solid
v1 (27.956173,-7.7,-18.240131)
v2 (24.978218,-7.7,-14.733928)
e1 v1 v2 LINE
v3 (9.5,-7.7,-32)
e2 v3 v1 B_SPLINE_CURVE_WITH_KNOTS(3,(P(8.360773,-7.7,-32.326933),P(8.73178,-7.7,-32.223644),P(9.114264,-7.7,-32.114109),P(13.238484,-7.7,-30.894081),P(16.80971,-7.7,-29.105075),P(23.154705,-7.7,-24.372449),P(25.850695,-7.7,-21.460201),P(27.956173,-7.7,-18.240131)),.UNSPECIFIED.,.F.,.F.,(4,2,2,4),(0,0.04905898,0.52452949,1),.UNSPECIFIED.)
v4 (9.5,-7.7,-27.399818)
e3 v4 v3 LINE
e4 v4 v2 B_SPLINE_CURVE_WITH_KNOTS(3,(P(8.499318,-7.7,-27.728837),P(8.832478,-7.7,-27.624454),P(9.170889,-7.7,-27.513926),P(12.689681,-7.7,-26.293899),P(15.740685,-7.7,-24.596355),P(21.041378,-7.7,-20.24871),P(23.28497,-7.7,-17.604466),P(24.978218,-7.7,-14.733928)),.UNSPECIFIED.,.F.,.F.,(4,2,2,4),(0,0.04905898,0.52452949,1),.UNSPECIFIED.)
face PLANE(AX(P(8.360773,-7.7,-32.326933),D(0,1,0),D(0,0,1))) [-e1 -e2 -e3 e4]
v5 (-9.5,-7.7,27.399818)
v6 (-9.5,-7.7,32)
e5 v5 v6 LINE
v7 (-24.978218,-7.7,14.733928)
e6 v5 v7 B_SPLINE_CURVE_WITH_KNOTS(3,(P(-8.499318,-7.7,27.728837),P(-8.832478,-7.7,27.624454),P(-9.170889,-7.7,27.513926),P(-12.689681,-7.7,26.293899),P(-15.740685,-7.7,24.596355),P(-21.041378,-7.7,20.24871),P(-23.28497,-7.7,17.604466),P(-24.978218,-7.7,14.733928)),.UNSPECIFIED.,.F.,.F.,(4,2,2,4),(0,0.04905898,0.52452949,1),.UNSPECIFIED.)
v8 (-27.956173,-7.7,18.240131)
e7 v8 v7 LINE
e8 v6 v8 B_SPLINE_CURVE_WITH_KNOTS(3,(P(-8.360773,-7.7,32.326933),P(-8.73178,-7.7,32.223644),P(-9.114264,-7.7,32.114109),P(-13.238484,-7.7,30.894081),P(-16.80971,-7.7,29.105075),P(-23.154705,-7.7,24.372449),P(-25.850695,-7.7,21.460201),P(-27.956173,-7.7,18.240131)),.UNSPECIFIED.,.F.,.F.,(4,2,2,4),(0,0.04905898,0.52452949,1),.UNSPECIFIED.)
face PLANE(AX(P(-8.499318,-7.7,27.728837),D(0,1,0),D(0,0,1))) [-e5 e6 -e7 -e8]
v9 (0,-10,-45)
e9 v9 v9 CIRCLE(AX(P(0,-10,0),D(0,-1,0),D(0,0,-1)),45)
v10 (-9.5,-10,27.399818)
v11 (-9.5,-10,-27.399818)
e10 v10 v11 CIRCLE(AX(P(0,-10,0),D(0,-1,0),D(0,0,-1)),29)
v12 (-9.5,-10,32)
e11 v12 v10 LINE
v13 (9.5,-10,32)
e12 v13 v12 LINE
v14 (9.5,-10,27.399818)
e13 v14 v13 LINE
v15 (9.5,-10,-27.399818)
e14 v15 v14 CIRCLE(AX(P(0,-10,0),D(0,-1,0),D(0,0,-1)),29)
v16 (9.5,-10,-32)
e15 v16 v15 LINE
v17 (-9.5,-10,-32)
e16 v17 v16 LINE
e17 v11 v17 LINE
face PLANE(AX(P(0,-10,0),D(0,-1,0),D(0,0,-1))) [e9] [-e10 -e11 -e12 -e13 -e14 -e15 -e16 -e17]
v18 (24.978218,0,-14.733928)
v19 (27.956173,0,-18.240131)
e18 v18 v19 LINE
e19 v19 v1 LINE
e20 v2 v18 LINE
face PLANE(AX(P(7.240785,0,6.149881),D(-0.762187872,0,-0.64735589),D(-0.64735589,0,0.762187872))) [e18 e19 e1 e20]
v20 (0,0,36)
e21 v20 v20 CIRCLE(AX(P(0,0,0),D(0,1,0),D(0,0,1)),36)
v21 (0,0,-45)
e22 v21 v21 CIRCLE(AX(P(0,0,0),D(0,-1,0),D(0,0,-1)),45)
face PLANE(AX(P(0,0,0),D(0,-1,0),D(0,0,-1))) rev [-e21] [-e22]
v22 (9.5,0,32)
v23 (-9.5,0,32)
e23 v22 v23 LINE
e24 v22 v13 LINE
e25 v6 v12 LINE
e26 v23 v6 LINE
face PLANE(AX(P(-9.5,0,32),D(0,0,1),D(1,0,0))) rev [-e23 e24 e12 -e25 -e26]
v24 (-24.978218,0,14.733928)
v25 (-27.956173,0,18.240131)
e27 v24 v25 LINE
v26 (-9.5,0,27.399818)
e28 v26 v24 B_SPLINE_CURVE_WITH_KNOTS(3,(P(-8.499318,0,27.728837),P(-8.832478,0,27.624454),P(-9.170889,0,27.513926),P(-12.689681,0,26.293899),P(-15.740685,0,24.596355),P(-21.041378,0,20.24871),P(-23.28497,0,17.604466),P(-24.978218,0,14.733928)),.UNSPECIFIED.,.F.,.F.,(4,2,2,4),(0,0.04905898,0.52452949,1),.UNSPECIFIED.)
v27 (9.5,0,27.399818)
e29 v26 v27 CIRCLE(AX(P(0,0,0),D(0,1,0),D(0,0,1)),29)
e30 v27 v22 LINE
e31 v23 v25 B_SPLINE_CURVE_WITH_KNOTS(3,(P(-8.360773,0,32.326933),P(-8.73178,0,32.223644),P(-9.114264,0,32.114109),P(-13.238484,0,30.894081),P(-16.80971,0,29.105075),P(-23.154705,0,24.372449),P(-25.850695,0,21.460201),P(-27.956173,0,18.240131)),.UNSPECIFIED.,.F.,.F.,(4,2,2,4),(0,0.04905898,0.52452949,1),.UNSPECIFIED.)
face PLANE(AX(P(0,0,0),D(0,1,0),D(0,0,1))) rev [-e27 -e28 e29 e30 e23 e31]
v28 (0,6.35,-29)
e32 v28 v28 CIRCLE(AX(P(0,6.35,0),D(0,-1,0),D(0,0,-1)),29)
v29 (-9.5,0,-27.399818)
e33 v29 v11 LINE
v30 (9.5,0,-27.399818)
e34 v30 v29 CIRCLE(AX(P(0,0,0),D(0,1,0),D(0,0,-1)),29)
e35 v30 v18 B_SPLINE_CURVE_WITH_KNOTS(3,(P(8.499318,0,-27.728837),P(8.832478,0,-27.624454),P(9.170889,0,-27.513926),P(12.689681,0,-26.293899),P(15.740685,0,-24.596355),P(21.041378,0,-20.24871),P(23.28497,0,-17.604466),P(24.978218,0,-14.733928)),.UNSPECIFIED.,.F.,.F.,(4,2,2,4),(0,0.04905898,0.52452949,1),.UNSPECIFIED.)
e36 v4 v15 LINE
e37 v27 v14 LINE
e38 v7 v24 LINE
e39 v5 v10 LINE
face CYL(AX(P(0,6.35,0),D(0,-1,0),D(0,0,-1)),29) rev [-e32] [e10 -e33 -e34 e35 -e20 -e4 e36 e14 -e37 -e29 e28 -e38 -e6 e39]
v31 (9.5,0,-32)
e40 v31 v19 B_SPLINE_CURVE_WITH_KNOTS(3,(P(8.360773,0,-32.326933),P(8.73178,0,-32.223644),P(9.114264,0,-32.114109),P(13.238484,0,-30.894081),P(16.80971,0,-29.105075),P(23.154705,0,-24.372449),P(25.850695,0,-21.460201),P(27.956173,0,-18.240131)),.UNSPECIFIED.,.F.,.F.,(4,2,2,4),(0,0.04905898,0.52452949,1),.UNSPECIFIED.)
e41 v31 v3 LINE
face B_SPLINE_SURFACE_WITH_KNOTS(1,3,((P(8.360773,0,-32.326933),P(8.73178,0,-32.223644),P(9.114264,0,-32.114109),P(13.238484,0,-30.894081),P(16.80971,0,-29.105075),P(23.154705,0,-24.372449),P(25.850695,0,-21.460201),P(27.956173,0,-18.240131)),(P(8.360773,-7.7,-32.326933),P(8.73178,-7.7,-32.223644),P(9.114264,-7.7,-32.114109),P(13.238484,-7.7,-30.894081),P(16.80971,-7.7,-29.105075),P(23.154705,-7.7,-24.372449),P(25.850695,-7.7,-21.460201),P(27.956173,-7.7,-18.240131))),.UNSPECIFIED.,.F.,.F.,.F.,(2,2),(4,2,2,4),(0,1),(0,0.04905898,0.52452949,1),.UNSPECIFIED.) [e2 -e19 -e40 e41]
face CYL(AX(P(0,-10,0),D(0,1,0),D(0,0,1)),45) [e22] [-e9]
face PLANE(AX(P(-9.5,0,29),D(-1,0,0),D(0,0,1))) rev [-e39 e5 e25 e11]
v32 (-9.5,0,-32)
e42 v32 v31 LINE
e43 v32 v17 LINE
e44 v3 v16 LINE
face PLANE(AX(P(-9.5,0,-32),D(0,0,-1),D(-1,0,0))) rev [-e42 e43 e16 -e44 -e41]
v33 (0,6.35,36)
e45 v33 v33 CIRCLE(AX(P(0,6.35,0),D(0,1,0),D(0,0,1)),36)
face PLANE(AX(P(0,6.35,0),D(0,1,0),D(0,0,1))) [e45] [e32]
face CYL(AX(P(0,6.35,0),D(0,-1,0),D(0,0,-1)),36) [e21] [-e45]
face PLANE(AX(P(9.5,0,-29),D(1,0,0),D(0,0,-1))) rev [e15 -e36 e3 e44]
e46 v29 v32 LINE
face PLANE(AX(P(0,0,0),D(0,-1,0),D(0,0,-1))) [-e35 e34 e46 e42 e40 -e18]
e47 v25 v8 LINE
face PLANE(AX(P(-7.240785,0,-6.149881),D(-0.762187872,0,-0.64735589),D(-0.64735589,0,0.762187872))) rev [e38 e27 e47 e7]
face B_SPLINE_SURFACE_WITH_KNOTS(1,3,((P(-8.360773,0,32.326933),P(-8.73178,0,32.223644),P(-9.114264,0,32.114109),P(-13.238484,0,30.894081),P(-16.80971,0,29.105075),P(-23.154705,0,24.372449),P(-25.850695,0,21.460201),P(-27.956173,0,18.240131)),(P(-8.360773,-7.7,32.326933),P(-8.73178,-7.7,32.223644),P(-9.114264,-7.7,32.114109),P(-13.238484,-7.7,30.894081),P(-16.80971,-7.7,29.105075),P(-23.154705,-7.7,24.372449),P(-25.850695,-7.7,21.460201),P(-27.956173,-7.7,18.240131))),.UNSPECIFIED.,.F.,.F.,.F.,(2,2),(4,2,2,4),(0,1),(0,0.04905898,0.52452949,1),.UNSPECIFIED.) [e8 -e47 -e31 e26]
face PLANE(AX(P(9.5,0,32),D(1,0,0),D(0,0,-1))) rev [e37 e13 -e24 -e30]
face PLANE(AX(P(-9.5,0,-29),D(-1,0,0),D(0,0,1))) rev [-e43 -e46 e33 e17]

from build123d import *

# Parameters (mm, degrees)
SKETCH1_R           = 36
BOSS_EXTRUDE1_DEPTH = 6.35
SKETCH2_R           = 29
CUT_EXTRUDE1_DEPTH  = 52.306164347
BOSS_EXTRUDE2_START = 10
SKETCH3_R           = 45
SKETCH3_R_2         = 29
BOSS_EXTRUDE2_DEPTH = 10
CUT_EXTRUDE2_DEPTH  = 10
CUT_SWEEP1_START    = -7.7
CUT_SWEEP1_DEPTH    = 7.7
CUT_SWEEP2_START    = -7.7
CUT_SWEEP2_DEPTH    = 7.7


# Read off the part's stored shape, not the designer's step: Cut-Sweep1, Cut-Sweep2
with BuildPart() as part:
    # Sketch1 → Boss-Extrude1 (new body)
    with BuildSketch(Plane(origin=(0, 0, 0), x_dir=(1, 0, 0), z_dir=(0, 1, 0))):
        with Locations(Location((0, 0, 0), (0, 0, 270))):
            Circle(SKETCH1_R)
    extrude(amount=BOSS_EXTRUDE1_DEPTH)

    # Sketch2 → Cut-Extrude1 (cut, through all)
    with BuildSketch(Plane(origin=(0, 0, 0), x_dir=(-1, 0, 0), z_dir=(0, -1, 0))):
        with Locations(Location((0, 0, 0), (0, 0, 90))):
            Circle(SKETCH2_R)
    extrude(amount=-CUT_EXTRUDE1_DEPTH, mode=Mode.SUBTRACT)

    # Sketch3 → Boss-Extrude2 (add)
    with BuildSketch(Plane.XZ.offset(BOSS_EXTRUDE2_START)):
        with Locations(Location((0, 0, 0), (0, 0, 270))):
            Circle(SKETCH3_R)
        with Locations(Location((0, 0, 0), (0, 0, 270))):
            Circle(SKETCH3_R_2, mode=Mode.SUBTRACT)
    extrude(amount=-BOSS_EXTRUDE2_DEPTH)

    # Sketch6 → Cut-Extrude2 (cut)
    with BuildSketch(Plane(origin=(0, -10, 0), x_dir=(-1, 0, 0), z_dir=(0, -1, 0))):
        with BuildLine():
            Line((9.5, -29), (9.5, -27.399817518))
            ThreePointArc((9.5, -27.399817518), (0, -29), (-9.5, -27.399817518))
            Line((-9.5, -27.399817518), (-9.5, -29))
            Line((-9.5, -29), (-9.5, -32))
            Line((-9.5, -32), (9.5, -32))
            Line((9.5, -32), (9.5, -29))
        make_face()
        with BuildLine():
            Line((9.5, 29), (9.5, 27.399817518))
            ThreePointArc((9.5, 27.399817518), (0, 29), (-9.5, 27.399817518))
            Line((-9.5, 27.399817518), (-9.5, 29))
            Line((-9.5, 29), (-9.5, 32))
            Line((-9.5, 32), (9.5, 32))
            Line((9.5, 32), (9.5, 29))
        make_face()
    extrude(amount=-CUT_EXTRUDE2_DEPTH, mode=Mode.SUBTRACT)

    # Cut-Sweep1 outline → Cut-Sweep1 (cut)
    with BuildSketch(Plane(origin=(0, 0, 0), x_dir=(1, 0, 0), z_dir=(0, 1, 0)).offset(CUT_SWEEP1_START)):
        with BuildLine():
            add(Edge.make_bspline(
                [(9.5, 32), (13.238484468, 30.894081247), (16.809709604, 29.105075442), (23.154704566, 24.372448809), (25.850694666, 21.46020132), (27.956173262, 18.240130935)],
                knots=[0.04905898, 0.04905898, 0.04905898, 0.04905898, 0.52452949, 0.52452949, 1, 1, 1, 1], degree=3))
            Line((9.5, 32), (9.5, 27.399817518))
            ThreePointArc((9.5, 27.399817518), (18.365540323, 22.443416154), (24.978218037, 14.73392764))
            Line((24.978218037, 14.73392764), (27.956173262, 18.240130935))
        make_face()
    extrude(amount=CUT_SWEEP1_DEPTH, mode=Mode.SUBTRACT)

    # Cut-Sweep2 outline → Cut-Sweep2 (cut)
    with BuildSketch(Plane(origin=(0, 0, 0), x_dir=(1, 0, 0), z_dir=(0, 1, 0)).offset(CUT_SWEEP2_START)):
        with BuildLine():
            add(Edge.make_bspline(
                [(-9.5, -32), (-13.238484468, -30.894081248), (-16.809709604, -29.105075442), (-23.154704566, -24.372448809), (-25.850694666, -21.46020132), (-27.956173262, -18.240130935)],
                knots=[0.04905898, 0.04905898, 0.04905898, 0.04905898, 0.52452949, 0.52452949, 1, 1, 1, 1], degree=3))
            Line((-9.5, -32), (-9.5, -27.399817518))
            ThreePointArc((-9.5, -27.399817518), (-18.365540323, -22.443416154), (-24.978218037, -14.73392764))
            Line((-24.978218037, -14.73392764), (-27.956173262, -18.240130935))
        make_face()
    extrude(amount=CUT_SWEEP2_DEPTH, mode=Mode.SUBTRACT)


solid = part.part
